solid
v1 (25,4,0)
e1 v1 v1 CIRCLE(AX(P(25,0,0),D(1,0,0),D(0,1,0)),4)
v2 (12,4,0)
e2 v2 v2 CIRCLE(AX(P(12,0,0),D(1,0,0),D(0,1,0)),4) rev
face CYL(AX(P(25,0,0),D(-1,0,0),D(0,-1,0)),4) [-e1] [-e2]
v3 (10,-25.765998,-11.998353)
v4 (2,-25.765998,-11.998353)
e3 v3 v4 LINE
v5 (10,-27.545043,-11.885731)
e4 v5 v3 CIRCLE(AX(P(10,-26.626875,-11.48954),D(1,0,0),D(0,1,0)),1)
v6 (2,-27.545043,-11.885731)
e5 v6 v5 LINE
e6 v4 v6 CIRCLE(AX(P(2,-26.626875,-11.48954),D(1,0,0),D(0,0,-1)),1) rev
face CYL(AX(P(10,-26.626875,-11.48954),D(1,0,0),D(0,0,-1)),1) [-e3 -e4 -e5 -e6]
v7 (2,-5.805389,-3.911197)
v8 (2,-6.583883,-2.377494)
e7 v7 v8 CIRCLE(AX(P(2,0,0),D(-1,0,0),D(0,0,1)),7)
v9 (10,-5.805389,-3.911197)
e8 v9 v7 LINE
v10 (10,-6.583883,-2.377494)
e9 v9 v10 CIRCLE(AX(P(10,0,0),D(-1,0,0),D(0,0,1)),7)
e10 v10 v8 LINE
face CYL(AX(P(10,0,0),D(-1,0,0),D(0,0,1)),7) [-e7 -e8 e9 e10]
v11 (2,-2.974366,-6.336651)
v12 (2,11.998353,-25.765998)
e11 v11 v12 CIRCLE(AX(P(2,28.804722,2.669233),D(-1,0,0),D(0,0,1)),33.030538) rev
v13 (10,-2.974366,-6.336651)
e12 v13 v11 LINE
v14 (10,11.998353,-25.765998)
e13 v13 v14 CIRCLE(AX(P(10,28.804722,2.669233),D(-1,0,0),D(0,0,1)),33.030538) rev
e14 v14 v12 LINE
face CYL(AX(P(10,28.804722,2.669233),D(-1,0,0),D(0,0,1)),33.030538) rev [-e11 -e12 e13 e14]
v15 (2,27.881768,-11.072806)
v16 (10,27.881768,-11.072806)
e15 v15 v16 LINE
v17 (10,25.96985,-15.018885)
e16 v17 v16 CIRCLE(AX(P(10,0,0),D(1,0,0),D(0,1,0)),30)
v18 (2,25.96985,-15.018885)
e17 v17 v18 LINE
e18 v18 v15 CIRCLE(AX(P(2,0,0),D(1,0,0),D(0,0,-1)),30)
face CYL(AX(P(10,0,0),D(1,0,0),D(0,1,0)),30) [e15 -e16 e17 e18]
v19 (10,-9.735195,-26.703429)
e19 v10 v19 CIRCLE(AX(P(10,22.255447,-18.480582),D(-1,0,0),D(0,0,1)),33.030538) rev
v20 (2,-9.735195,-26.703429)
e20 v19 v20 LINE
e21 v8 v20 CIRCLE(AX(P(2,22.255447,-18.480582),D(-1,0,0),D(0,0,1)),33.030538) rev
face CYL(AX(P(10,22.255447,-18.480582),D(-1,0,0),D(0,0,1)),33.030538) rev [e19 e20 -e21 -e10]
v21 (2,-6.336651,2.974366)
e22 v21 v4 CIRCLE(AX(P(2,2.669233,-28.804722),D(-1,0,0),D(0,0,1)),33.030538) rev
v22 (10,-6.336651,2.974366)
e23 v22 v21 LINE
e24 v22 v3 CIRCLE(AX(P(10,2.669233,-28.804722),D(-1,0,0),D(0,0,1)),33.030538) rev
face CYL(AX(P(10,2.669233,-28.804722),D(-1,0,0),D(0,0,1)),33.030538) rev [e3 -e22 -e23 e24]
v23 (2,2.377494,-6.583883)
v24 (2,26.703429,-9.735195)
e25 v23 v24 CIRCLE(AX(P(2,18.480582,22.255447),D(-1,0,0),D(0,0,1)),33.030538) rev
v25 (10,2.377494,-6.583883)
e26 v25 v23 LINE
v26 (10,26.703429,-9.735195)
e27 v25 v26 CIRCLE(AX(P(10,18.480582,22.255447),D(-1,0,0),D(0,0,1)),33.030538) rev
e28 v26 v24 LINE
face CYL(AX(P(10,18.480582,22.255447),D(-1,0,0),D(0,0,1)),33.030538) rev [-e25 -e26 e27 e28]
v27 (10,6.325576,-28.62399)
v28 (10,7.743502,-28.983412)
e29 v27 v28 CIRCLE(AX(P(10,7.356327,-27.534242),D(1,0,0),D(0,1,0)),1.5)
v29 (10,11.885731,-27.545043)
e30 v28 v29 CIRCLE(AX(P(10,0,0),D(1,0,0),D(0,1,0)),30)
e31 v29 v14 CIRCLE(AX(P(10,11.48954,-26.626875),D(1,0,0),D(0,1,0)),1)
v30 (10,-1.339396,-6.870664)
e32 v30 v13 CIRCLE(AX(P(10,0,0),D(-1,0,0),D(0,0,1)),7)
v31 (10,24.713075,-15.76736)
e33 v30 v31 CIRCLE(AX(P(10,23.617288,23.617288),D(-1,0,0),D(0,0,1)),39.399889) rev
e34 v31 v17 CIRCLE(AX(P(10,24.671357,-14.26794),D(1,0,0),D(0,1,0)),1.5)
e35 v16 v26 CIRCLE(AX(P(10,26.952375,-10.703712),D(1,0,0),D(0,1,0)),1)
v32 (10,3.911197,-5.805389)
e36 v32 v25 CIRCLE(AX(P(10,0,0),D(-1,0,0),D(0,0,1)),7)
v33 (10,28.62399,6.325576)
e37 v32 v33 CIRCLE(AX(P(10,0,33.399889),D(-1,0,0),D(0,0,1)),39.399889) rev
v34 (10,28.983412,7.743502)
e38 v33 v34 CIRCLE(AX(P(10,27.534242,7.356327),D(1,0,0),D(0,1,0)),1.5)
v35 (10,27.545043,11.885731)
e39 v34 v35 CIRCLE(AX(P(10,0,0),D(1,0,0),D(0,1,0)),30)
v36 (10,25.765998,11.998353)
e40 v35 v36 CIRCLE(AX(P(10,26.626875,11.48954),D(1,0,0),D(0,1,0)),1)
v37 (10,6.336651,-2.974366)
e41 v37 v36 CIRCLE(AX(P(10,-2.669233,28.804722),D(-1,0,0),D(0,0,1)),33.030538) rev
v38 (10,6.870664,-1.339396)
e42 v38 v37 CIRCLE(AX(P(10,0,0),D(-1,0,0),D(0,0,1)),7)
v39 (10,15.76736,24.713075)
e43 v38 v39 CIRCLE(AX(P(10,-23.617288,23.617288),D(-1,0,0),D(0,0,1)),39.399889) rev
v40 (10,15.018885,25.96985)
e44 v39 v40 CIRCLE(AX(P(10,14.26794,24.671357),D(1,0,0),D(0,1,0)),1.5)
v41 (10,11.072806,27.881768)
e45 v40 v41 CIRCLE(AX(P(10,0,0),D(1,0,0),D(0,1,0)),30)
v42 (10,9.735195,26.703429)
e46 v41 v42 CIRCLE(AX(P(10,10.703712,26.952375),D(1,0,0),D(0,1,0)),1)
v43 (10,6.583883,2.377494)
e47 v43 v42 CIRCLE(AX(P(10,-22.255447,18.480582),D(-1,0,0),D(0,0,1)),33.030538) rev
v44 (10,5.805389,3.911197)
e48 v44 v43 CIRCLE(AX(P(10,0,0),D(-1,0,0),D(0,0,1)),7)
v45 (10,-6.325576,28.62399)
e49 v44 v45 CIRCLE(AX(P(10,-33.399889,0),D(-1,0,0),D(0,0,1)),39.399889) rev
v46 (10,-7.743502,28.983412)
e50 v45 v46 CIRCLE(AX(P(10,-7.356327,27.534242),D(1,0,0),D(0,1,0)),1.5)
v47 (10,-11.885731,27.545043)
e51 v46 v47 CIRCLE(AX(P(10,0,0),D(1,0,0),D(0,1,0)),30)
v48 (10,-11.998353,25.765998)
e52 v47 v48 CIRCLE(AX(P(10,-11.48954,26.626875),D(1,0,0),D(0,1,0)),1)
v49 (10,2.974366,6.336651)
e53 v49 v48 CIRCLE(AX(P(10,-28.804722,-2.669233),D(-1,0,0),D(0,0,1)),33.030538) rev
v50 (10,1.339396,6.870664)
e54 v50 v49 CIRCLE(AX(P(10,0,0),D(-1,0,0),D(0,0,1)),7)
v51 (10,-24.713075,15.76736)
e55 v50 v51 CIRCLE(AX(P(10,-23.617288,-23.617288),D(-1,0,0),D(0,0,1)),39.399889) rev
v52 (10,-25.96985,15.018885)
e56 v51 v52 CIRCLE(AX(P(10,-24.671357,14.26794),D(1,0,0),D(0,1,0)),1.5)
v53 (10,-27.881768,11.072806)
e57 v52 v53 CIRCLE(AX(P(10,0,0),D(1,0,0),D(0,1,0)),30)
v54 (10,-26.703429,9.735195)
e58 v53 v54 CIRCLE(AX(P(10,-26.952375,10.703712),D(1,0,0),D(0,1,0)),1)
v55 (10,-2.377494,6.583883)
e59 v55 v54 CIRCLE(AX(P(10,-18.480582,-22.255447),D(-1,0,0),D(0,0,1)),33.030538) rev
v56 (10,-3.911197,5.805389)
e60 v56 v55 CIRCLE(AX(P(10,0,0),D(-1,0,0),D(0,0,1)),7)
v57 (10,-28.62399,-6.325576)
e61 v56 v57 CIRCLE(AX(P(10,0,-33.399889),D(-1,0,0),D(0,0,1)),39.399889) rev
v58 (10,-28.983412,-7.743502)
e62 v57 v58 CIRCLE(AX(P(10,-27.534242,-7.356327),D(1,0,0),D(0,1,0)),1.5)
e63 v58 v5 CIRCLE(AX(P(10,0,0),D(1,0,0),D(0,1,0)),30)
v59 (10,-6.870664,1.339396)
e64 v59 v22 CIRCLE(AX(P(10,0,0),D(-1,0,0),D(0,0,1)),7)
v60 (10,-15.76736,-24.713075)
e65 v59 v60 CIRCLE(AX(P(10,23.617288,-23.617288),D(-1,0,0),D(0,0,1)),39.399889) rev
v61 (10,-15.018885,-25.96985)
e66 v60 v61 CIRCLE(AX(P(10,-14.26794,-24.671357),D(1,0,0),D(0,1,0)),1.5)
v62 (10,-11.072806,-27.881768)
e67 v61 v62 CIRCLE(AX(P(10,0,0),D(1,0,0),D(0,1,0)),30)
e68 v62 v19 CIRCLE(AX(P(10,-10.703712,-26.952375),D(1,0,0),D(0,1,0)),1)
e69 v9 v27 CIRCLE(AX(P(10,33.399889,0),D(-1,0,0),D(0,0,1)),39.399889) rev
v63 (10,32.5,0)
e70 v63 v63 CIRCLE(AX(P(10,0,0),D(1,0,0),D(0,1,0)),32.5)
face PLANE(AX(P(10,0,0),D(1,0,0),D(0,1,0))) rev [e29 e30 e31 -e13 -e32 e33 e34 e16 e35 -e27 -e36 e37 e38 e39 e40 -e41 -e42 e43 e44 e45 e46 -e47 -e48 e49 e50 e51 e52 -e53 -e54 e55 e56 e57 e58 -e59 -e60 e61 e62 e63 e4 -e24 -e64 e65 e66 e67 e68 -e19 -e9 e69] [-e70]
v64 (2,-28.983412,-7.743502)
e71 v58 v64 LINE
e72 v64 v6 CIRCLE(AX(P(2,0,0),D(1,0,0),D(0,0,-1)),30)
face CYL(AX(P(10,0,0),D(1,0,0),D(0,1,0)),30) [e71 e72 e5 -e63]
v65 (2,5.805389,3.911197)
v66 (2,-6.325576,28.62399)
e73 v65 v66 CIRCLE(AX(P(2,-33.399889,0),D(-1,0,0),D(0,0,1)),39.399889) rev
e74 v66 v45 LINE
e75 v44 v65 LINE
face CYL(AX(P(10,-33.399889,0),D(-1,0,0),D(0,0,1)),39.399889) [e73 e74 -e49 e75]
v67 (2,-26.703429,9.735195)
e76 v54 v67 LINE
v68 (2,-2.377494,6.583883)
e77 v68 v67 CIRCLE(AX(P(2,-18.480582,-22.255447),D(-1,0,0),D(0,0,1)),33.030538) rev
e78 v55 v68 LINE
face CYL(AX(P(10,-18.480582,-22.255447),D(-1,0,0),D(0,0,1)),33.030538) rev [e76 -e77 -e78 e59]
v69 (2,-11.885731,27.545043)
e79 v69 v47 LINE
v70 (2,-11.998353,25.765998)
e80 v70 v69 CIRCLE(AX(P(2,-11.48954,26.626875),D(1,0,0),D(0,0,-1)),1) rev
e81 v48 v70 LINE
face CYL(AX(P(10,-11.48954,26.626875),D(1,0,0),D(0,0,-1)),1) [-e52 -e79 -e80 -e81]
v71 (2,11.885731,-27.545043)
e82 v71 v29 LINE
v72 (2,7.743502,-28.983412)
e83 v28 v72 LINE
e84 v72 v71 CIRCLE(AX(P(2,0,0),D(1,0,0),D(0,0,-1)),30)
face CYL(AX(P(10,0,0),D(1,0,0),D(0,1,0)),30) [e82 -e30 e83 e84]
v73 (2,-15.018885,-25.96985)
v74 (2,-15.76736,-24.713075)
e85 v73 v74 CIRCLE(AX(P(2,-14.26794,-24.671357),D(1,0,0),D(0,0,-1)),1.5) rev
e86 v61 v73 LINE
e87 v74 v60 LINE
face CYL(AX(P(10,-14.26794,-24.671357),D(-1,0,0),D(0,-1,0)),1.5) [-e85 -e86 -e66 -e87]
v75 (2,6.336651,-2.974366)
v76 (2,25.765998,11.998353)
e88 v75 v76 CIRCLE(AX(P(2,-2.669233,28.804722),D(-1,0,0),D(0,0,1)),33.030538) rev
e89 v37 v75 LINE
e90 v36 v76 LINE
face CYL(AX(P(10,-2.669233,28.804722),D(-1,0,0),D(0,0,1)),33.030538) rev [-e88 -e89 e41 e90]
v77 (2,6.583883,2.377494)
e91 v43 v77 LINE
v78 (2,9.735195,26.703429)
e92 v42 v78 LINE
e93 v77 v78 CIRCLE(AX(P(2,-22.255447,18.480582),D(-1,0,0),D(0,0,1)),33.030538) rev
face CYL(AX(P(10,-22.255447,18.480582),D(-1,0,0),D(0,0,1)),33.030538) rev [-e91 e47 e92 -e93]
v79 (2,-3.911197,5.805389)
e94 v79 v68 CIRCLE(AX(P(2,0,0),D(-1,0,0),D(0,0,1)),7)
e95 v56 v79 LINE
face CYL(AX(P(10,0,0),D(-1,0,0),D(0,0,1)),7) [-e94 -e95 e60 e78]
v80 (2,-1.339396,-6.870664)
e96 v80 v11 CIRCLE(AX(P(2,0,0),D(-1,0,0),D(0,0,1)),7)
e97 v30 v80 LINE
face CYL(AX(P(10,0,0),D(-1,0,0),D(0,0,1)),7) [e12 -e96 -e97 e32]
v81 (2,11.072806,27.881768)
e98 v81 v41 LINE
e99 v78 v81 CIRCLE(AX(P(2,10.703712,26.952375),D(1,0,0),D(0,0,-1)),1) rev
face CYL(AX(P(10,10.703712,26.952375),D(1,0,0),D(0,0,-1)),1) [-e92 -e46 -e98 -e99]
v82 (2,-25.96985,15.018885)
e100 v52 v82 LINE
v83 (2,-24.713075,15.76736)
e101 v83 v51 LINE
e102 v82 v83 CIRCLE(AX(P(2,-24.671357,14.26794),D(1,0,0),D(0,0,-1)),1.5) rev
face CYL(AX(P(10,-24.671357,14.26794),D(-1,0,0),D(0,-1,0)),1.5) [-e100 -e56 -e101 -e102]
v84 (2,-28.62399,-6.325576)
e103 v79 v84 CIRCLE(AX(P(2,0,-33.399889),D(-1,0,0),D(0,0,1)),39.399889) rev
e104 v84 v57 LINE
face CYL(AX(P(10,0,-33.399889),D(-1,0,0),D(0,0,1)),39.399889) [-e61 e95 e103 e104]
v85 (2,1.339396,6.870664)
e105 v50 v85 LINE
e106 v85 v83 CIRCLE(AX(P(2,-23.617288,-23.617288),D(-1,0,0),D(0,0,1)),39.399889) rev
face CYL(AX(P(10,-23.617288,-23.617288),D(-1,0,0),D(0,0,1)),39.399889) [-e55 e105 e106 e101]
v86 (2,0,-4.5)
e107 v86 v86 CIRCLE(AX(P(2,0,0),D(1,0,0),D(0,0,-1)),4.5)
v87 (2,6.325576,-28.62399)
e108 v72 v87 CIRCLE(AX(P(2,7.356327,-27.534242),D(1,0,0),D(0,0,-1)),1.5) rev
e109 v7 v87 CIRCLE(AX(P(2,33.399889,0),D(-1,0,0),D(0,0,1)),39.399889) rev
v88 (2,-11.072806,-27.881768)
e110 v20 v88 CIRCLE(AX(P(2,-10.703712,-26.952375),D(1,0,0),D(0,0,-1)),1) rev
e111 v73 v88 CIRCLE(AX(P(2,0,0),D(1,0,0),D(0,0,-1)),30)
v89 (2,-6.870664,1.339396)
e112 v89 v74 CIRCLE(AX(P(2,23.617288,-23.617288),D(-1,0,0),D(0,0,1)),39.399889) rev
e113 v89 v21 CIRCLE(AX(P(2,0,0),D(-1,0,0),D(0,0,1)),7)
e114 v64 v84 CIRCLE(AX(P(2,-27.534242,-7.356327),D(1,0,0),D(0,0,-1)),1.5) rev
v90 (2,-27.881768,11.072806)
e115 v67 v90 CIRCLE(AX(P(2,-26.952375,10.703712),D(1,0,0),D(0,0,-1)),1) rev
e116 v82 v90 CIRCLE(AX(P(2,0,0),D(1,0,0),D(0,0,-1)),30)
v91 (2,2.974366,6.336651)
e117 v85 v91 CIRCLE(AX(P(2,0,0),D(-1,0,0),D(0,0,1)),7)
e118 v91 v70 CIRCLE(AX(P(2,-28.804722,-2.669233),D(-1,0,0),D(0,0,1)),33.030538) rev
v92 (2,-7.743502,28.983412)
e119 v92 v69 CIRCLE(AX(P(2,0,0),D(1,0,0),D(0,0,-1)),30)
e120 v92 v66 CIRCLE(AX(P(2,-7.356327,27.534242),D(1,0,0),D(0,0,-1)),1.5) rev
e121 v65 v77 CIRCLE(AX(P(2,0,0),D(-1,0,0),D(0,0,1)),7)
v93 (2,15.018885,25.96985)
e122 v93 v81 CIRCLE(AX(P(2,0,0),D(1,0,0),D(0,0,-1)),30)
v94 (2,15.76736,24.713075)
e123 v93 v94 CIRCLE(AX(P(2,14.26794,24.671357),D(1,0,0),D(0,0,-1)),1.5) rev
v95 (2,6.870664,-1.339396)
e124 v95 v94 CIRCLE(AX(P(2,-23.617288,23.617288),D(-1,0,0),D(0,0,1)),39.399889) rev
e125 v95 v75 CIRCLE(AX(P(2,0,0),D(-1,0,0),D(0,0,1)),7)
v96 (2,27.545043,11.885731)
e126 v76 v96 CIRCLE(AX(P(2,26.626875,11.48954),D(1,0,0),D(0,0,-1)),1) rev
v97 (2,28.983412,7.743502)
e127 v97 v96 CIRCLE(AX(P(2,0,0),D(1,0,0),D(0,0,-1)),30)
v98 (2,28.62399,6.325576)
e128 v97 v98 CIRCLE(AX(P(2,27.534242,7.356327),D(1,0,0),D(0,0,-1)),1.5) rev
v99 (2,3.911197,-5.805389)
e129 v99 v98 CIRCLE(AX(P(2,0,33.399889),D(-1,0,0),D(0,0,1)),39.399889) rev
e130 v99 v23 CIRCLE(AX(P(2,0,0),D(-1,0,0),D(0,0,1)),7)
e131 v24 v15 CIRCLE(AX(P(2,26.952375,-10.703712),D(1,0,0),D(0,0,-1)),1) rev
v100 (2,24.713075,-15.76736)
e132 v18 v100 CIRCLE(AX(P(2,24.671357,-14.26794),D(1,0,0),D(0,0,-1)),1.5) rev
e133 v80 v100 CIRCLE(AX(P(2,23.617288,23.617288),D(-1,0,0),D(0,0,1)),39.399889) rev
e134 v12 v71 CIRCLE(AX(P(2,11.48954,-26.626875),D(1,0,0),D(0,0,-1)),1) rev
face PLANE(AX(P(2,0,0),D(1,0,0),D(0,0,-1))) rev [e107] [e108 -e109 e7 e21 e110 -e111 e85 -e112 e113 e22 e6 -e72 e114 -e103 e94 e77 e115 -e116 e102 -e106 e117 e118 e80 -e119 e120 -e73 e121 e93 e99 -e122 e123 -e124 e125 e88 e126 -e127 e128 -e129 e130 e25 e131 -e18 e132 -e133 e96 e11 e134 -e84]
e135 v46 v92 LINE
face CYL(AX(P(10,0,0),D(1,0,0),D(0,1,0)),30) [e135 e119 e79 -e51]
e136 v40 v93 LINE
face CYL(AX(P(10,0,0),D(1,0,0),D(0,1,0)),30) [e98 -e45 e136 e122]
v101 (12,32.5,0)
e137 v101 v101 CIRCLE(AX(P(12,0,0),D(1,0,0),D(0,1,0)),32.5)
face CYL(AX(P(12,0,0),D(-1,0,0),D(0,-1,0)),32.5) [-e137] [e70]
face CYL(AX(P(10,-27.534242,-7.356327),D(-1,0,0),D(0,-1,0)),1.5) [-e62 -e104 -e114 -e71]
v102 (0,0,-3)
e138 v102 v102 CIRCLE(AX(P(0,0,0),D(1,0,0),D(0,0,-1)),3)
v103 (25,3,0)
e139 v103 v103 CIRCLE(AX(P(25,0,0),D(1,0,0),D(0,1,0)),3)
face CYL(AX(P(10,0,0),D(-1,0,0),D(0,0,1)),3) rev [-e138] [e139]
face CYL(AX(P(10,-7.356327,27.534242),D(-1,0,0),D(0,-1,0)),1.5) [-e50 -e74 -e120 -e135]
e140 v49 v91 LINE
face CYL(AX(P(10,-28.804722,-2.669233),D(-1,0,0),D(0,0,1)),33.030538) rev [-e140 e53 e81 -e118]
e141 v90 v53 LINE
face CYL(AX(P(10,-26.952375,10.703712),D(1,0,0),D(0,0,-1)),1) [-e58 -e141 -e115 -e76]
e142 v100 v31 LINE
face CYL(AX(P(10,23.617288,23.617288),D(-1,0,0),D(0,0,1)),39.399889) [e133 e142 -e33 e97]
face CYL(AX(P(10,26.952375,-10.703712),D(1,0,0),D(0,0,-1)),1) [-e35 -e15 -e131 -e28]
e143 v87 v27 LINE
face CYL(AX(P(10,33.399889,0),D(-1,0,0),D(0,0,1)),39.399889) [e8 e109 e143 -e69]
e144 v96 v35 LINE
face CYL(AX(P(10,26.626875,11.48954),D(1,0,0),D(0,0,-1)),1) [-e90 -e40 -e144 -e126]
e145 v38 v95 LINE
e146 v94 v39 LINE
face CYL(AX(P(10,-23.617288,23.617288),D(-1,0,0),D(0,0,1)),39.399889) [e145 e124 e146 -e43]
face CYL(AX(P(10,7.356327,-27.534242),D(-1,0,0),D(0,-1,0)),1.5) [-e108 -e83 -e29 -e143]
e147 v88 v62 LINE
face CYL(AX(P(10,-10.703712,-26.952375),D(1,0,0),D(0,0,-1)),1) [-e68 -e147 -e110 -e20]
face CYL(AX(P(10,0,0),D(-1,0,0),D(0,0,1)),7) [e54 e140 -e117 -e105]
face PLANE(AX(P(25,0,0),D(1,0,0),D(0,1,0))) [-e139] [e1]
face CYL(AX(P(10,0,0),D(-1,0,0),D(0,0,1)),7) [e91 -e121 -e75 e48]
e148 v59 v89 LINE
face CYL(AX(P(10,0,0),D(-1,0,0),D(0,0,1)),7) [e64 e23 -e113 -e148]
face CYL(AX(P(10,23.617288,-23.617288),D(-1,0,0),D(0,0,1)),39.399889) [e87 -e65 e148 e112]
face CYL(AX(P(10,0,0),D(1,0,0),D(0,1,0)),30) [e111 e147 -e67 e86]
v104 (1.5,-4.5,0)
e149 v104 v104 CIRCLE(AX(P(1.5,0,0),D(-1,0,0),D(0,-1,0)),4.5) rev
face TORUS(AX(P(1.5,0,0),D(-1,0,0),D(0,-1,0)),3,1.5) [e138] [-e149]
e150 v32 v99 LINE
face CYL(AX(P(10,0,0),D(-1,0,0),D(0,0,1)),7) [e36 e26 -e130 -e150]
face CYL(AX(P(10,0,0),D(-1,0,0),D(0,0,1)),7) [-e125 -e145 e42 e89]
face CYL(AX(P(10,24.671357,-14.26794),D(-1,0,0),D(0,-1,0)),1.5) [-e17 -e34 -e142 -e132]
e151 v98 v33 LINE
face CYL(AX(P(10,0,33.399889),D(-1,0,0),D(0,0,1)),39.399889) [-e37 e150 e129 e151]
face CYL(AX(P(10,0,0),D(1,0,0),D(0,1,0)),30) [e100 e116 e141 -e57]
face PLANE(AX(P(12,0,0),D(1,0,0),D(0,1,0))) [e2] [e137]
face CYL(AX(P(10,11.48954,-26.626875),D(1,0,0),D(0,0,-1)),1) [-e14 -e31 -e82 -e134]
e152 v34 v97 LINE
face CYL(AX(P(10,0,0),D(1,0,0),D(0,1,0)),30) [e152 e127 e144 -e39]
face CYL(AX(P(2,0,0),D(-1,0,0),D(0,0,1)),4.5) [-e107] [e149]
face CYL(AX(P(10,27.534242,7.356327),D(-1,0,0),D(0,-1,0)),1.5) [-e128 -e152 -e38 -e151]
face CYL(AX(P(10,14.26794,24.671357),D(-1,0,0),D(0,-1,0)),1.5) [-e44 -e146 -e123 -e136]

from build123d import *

# Parameters (mm, degrees)
SKETCH3_W           = 10
SKETCH3_H           = 30
SKETCH4_R           = 3
CUT_EXTRUDE2_DEPTH  = 10
CUT_EXTRUDE3_START  = 2
SKETCH5_R           = 30
SKETCH5_R_2         = 4.5
CUT_EXTRUDE3_DEPTH  = 2
FILLET2_R           = 1.5
CUT_EXTRUDE6_START  = -8
CUT_EXTRUDE6_DEPTH  = 8
FILLET3_R           = 1.5
FILLET4_R           = 1
SKETCH11_R          = 32.5
SKETCH11_R_2        = 3
BOSS_EXTRUDE4_DEPTH = 2
SKETCH12_R          = 4
SKETCH12_R_2        = 3
BOSS_EXTRUDE5_DEPTH = 15


with BuildPart() as part:
    # Sketch3 → Revolve3 (revolve)
    with BuildSketch(Plane.XY):
        with Locations((5, 15)):
            Rectangle(SKETCH3_W, SKETCH3_H)
    revolve(axis=Axis((10, 0, 0), (-1, 0, 0)))

    # Sketch4 → Cut-Extrude2 (cut)
    with BuildSketch(Plane(origin=(0, 0, 0), x_dir=(0, 0, -1), z_dir=(1, 0, 0))):
        Circle(SKETCH4_R)
    extrude(amount=CUT_EXTRUDE2_DEPTH, mode=Mode.SUBTRACT)

    # Sketch5 → Cut-Extrude3 (cut)
    with BuildSketch(Plane(origin=(0, 0, 0), x_dir=(0, 0, -1), z_dir=(1, 0, 0)).offset(CUT_EXTRUDE3_START)):
        with Locations(Location((0, 0, 0), (0, 0, 90))):
            Circle(SKETCH5_R)
        Circle(SKETCH5_R_2, mode=Mode.SUBTRACT)
    extrude(amount=-CUT_EXTRUDE3_DEPTH, mode=Mode.SUBTRACT)

    # Fillet2
    fillet2_edges = [part.edges().sort_by_distance(p)[0] for p in [
        (0, 0, 4.5),
    ]]
    fillet(fillet2_edges, radius=FILLET2_R - 0.0001)  # a hair under: the kernel refuses the full size

    # Sketch6 → Cut-Extrude6 (cut)
    with BuildSketch(Plane.ZY.offset(-2).offset(CUT_EXTRUDE6_START)):
        with BuildLine():
            ThreePointArc((-3.911197191, -5.805388577), (-17.732937141, -1.783831627), (-29.187621061, 6.934174556))
            ThreePointArc((-29.187621061, 6.934174556), (-29.97689762, -1.177118976), (-28.554011024, -9.201546306))
            ThreePointArc((-28.554011024, -9.201546306), (-15.193906429, -10.611164811), (-2.377494131, -6.583883478))
            ThreePointArc((-2.377494131, -6.583883478), (-3.168347079, -6.241920921), (-3.911197191, -5.805388577))
        make_face()
        with BuildLine():
            ThreePointArc((-6.870663687, -1.339395574), (-13.800439543, 11.277720662), (-15.735562929, 25.54196663))
            ThreePointArc((-15.735562929, 25.54196663), (-22.029216396, 20.364518776), (-26.697210616, 13.684259035))
            ThreePointArc((-26.697210616, 13.684259035), (-18.246940863, 3.240487675), (-6.336650876, -2.974366432))
            ThreePointArc((-6.336650876, -2.974366432), (-6.654064316, -2.173344906), (-6.870663687, -1.339395574))
        make_face()
        with BuildLine():
            ThreePointArc((-25.54196663, -15.735562929), (-20.364518776, -22.029216396), (-13.684259035, -26.697210616))
            ThreePointArc((-13.684259035, -26.697210616), (-3.240487675, -18.246940863), (2.974366432, -6.336650876))
            ThreePointArc((2.974366432, -6.336650876), (2.173344906, -6.654064316), (1.339395574, -6.870663687))
            ThreePointArc((1.339395574, -6.870663687), (-11.277720662, -13.800439543), (-25.54196663, -15.735562929))
        make_face()
        with BuildLine():
            ThreePointArc((-6.934174556, -29.187621061), (1.177118976, -29.97689762), (9.201546306, -28.554011024))
            ThreePointArc((9.201546306, -28.554011024), (10.611164811, -15.193906429), (6.583883478, -2.377494131))
            ThreePointArc((6.583883478, -2.377494131), (6.241920921, -3.168347079), (5.805388577, -3.911197191))
            ThreePointArc((5.805388577, -3.911197191), (1.783831627, -17.732937141), (-6.934174556, -29.187621061))
        make_face()
        with BuildLine():
            ThreePointArc((15.735562929, -25.54196663), (22.029216396, -20.364518776), (26.697210616, -13.684259035))
            ThreePointArc((26.697210616, -13.684259035), (18.246940863, -3.240487675), (6.336650876, 2.974366432))
            ThreePointArc((6.336650876, 2.974366432), (6.654064316, 2.173344906), (6.870663687, 1.339395574))
            ThreePointArc((6.870663687, 1.339395574), (13.800439543, -11.277720662), (15.735562929, -25.54196663))
        make_face()
        with BuildLine():
            ThreePointArc((29.187621061, -6.934174556), (29.796213114, -3.49079992), (30, 0))
            ThreePointArc((30, 0), (29.636298105, 4.657234655), (28.554011024, 9.201546306))
            ThreePointArc((28.554011024, 9.201546306), (15.193906429, 10.611164811), (2.377494131, 6.583883478))
            ThreePointArc((2.377494131, 6.583883478), (3.168347079, 6.241920921), (3.911197191, 5.805388577))
            ThreePointArc((3.911197191, 5.805388577), (17.732937141, 1.783831627), (29.187621061, -6.934174556))
        make_face()
        with BuildLine():
            ThreePointArc((-1.339395574, 6.870663687), (11.277720662, 13.800439543), (25.54196663, 15.735562929))
            ThreePointArc((25.54196663, 15.735562929), (20.364518776, 22.029216396), (13.684259035, 26.697210616))
            ThreePointArc((13.684259035, 26.697210616), (3.240487675, 18.246940863), (-2.974366432, 6.336650876))
            ThreePointArc((-2.974366432, 6.336650876), (-2.173344906, 6.654064316), (-1.339395574, 6.870663687))
        make_face()
        with BuildLine():
            ThreePointArc((-5.805388577, 3.911197191), (-1.783831627, 17.732937141), (6.934174556, 29.187621061))
            ThreePointArc((6.934174556, 29.187621061), (-1.177118976, 29.97689762), (-9.201546306, 28.554011024))
            ThreePointArc((-9.201546306, 28.554011024), (-10.611164811, 15.193906429), (-6.583883478, 2.377494131))
            ThreePointArc((-6.583883478, 2.377494131), (-6.241920921, 3.168347079), (-5.805388577, 3.911197191))
        make_face()
    extrude(amount=CUT_EXTRUDE6_DEPTH, mode=Mode.SUBTRACT)

    # Fillet3
    fillet3_edges = [part.edges().sort_by_distance(p)[0] for p in [
        (6, 15.735562929, 25.54196663),
        (6, 29.187621061, 6.934174556),
        (6, 6.934174556, -29.187621061),
        (6, 25.54196663, -15.735562929),
        (6, -15.735562929, -25.54196663),
        (6, -29.187621061, -6.934174556),
        (6, -25.54196663, 15.735562929),
        (6, -6.934174556, 29.187621061),
    ]]
    fillet(fillet3_edges, radius=FILLET3_R)

    # Fillet4
    fillet4_edges = [part.edges().sort_by_distance(p)[0] for p in [
        (6, 26.697210616, 13.684259035),
        (6, 28.554011024, -9.201546306),
        (6, -9.201546306, -28.554011024),
        (6, 13.684259035, -26.697210616),
        (6, -26.697210616, -13.684259035),
        (6, -28.554011024, 9.201546306),
        (6, -13.684259035, 26.697210616),
        (6, 9.201546306, 28.554011024),
    ]]
    fillet(fillet4_edges, radius=FILLET4_R)

    # Sketch11 → Boss-Extrude4 (add)
    with BuildSketch(Plane(origin=(10, 0, 0), x_dir=(0, 0, -1), z_dir=(1, 0, 0))):
        with Locations(Location((0, 0, 0), (0, 0, 90))):
            Circle(SKETCH11_R)
        with Locations(Location((0, 0, 0), (0, 0, 90))):
            Circle(SKETCH11_R_2, mode=Mode.SUBTRACT)
    extrude(amount=BOSS_EXTRUDE4_DEPTH)

    # Sketch12 → Boss-Extrude5 (add)
    with BuildSketch(Plane(origin=(10, 0, 0), x_dir=(0, 0, -1), z_dir=(1, 0, 0))):
        with Locations(Location((0, 0, 0), (0, 0, 90))):
            Circle(SKETCH12_R)
        with Locations(Location((0, 0, 0), (0, 0, 90))):
            Circle(SKETCH12_R_2, mode=Mode.SUBTRACT)
    extrude(amount=BOSS_EXTRUDE5_DEPTH)


solid = part.part
